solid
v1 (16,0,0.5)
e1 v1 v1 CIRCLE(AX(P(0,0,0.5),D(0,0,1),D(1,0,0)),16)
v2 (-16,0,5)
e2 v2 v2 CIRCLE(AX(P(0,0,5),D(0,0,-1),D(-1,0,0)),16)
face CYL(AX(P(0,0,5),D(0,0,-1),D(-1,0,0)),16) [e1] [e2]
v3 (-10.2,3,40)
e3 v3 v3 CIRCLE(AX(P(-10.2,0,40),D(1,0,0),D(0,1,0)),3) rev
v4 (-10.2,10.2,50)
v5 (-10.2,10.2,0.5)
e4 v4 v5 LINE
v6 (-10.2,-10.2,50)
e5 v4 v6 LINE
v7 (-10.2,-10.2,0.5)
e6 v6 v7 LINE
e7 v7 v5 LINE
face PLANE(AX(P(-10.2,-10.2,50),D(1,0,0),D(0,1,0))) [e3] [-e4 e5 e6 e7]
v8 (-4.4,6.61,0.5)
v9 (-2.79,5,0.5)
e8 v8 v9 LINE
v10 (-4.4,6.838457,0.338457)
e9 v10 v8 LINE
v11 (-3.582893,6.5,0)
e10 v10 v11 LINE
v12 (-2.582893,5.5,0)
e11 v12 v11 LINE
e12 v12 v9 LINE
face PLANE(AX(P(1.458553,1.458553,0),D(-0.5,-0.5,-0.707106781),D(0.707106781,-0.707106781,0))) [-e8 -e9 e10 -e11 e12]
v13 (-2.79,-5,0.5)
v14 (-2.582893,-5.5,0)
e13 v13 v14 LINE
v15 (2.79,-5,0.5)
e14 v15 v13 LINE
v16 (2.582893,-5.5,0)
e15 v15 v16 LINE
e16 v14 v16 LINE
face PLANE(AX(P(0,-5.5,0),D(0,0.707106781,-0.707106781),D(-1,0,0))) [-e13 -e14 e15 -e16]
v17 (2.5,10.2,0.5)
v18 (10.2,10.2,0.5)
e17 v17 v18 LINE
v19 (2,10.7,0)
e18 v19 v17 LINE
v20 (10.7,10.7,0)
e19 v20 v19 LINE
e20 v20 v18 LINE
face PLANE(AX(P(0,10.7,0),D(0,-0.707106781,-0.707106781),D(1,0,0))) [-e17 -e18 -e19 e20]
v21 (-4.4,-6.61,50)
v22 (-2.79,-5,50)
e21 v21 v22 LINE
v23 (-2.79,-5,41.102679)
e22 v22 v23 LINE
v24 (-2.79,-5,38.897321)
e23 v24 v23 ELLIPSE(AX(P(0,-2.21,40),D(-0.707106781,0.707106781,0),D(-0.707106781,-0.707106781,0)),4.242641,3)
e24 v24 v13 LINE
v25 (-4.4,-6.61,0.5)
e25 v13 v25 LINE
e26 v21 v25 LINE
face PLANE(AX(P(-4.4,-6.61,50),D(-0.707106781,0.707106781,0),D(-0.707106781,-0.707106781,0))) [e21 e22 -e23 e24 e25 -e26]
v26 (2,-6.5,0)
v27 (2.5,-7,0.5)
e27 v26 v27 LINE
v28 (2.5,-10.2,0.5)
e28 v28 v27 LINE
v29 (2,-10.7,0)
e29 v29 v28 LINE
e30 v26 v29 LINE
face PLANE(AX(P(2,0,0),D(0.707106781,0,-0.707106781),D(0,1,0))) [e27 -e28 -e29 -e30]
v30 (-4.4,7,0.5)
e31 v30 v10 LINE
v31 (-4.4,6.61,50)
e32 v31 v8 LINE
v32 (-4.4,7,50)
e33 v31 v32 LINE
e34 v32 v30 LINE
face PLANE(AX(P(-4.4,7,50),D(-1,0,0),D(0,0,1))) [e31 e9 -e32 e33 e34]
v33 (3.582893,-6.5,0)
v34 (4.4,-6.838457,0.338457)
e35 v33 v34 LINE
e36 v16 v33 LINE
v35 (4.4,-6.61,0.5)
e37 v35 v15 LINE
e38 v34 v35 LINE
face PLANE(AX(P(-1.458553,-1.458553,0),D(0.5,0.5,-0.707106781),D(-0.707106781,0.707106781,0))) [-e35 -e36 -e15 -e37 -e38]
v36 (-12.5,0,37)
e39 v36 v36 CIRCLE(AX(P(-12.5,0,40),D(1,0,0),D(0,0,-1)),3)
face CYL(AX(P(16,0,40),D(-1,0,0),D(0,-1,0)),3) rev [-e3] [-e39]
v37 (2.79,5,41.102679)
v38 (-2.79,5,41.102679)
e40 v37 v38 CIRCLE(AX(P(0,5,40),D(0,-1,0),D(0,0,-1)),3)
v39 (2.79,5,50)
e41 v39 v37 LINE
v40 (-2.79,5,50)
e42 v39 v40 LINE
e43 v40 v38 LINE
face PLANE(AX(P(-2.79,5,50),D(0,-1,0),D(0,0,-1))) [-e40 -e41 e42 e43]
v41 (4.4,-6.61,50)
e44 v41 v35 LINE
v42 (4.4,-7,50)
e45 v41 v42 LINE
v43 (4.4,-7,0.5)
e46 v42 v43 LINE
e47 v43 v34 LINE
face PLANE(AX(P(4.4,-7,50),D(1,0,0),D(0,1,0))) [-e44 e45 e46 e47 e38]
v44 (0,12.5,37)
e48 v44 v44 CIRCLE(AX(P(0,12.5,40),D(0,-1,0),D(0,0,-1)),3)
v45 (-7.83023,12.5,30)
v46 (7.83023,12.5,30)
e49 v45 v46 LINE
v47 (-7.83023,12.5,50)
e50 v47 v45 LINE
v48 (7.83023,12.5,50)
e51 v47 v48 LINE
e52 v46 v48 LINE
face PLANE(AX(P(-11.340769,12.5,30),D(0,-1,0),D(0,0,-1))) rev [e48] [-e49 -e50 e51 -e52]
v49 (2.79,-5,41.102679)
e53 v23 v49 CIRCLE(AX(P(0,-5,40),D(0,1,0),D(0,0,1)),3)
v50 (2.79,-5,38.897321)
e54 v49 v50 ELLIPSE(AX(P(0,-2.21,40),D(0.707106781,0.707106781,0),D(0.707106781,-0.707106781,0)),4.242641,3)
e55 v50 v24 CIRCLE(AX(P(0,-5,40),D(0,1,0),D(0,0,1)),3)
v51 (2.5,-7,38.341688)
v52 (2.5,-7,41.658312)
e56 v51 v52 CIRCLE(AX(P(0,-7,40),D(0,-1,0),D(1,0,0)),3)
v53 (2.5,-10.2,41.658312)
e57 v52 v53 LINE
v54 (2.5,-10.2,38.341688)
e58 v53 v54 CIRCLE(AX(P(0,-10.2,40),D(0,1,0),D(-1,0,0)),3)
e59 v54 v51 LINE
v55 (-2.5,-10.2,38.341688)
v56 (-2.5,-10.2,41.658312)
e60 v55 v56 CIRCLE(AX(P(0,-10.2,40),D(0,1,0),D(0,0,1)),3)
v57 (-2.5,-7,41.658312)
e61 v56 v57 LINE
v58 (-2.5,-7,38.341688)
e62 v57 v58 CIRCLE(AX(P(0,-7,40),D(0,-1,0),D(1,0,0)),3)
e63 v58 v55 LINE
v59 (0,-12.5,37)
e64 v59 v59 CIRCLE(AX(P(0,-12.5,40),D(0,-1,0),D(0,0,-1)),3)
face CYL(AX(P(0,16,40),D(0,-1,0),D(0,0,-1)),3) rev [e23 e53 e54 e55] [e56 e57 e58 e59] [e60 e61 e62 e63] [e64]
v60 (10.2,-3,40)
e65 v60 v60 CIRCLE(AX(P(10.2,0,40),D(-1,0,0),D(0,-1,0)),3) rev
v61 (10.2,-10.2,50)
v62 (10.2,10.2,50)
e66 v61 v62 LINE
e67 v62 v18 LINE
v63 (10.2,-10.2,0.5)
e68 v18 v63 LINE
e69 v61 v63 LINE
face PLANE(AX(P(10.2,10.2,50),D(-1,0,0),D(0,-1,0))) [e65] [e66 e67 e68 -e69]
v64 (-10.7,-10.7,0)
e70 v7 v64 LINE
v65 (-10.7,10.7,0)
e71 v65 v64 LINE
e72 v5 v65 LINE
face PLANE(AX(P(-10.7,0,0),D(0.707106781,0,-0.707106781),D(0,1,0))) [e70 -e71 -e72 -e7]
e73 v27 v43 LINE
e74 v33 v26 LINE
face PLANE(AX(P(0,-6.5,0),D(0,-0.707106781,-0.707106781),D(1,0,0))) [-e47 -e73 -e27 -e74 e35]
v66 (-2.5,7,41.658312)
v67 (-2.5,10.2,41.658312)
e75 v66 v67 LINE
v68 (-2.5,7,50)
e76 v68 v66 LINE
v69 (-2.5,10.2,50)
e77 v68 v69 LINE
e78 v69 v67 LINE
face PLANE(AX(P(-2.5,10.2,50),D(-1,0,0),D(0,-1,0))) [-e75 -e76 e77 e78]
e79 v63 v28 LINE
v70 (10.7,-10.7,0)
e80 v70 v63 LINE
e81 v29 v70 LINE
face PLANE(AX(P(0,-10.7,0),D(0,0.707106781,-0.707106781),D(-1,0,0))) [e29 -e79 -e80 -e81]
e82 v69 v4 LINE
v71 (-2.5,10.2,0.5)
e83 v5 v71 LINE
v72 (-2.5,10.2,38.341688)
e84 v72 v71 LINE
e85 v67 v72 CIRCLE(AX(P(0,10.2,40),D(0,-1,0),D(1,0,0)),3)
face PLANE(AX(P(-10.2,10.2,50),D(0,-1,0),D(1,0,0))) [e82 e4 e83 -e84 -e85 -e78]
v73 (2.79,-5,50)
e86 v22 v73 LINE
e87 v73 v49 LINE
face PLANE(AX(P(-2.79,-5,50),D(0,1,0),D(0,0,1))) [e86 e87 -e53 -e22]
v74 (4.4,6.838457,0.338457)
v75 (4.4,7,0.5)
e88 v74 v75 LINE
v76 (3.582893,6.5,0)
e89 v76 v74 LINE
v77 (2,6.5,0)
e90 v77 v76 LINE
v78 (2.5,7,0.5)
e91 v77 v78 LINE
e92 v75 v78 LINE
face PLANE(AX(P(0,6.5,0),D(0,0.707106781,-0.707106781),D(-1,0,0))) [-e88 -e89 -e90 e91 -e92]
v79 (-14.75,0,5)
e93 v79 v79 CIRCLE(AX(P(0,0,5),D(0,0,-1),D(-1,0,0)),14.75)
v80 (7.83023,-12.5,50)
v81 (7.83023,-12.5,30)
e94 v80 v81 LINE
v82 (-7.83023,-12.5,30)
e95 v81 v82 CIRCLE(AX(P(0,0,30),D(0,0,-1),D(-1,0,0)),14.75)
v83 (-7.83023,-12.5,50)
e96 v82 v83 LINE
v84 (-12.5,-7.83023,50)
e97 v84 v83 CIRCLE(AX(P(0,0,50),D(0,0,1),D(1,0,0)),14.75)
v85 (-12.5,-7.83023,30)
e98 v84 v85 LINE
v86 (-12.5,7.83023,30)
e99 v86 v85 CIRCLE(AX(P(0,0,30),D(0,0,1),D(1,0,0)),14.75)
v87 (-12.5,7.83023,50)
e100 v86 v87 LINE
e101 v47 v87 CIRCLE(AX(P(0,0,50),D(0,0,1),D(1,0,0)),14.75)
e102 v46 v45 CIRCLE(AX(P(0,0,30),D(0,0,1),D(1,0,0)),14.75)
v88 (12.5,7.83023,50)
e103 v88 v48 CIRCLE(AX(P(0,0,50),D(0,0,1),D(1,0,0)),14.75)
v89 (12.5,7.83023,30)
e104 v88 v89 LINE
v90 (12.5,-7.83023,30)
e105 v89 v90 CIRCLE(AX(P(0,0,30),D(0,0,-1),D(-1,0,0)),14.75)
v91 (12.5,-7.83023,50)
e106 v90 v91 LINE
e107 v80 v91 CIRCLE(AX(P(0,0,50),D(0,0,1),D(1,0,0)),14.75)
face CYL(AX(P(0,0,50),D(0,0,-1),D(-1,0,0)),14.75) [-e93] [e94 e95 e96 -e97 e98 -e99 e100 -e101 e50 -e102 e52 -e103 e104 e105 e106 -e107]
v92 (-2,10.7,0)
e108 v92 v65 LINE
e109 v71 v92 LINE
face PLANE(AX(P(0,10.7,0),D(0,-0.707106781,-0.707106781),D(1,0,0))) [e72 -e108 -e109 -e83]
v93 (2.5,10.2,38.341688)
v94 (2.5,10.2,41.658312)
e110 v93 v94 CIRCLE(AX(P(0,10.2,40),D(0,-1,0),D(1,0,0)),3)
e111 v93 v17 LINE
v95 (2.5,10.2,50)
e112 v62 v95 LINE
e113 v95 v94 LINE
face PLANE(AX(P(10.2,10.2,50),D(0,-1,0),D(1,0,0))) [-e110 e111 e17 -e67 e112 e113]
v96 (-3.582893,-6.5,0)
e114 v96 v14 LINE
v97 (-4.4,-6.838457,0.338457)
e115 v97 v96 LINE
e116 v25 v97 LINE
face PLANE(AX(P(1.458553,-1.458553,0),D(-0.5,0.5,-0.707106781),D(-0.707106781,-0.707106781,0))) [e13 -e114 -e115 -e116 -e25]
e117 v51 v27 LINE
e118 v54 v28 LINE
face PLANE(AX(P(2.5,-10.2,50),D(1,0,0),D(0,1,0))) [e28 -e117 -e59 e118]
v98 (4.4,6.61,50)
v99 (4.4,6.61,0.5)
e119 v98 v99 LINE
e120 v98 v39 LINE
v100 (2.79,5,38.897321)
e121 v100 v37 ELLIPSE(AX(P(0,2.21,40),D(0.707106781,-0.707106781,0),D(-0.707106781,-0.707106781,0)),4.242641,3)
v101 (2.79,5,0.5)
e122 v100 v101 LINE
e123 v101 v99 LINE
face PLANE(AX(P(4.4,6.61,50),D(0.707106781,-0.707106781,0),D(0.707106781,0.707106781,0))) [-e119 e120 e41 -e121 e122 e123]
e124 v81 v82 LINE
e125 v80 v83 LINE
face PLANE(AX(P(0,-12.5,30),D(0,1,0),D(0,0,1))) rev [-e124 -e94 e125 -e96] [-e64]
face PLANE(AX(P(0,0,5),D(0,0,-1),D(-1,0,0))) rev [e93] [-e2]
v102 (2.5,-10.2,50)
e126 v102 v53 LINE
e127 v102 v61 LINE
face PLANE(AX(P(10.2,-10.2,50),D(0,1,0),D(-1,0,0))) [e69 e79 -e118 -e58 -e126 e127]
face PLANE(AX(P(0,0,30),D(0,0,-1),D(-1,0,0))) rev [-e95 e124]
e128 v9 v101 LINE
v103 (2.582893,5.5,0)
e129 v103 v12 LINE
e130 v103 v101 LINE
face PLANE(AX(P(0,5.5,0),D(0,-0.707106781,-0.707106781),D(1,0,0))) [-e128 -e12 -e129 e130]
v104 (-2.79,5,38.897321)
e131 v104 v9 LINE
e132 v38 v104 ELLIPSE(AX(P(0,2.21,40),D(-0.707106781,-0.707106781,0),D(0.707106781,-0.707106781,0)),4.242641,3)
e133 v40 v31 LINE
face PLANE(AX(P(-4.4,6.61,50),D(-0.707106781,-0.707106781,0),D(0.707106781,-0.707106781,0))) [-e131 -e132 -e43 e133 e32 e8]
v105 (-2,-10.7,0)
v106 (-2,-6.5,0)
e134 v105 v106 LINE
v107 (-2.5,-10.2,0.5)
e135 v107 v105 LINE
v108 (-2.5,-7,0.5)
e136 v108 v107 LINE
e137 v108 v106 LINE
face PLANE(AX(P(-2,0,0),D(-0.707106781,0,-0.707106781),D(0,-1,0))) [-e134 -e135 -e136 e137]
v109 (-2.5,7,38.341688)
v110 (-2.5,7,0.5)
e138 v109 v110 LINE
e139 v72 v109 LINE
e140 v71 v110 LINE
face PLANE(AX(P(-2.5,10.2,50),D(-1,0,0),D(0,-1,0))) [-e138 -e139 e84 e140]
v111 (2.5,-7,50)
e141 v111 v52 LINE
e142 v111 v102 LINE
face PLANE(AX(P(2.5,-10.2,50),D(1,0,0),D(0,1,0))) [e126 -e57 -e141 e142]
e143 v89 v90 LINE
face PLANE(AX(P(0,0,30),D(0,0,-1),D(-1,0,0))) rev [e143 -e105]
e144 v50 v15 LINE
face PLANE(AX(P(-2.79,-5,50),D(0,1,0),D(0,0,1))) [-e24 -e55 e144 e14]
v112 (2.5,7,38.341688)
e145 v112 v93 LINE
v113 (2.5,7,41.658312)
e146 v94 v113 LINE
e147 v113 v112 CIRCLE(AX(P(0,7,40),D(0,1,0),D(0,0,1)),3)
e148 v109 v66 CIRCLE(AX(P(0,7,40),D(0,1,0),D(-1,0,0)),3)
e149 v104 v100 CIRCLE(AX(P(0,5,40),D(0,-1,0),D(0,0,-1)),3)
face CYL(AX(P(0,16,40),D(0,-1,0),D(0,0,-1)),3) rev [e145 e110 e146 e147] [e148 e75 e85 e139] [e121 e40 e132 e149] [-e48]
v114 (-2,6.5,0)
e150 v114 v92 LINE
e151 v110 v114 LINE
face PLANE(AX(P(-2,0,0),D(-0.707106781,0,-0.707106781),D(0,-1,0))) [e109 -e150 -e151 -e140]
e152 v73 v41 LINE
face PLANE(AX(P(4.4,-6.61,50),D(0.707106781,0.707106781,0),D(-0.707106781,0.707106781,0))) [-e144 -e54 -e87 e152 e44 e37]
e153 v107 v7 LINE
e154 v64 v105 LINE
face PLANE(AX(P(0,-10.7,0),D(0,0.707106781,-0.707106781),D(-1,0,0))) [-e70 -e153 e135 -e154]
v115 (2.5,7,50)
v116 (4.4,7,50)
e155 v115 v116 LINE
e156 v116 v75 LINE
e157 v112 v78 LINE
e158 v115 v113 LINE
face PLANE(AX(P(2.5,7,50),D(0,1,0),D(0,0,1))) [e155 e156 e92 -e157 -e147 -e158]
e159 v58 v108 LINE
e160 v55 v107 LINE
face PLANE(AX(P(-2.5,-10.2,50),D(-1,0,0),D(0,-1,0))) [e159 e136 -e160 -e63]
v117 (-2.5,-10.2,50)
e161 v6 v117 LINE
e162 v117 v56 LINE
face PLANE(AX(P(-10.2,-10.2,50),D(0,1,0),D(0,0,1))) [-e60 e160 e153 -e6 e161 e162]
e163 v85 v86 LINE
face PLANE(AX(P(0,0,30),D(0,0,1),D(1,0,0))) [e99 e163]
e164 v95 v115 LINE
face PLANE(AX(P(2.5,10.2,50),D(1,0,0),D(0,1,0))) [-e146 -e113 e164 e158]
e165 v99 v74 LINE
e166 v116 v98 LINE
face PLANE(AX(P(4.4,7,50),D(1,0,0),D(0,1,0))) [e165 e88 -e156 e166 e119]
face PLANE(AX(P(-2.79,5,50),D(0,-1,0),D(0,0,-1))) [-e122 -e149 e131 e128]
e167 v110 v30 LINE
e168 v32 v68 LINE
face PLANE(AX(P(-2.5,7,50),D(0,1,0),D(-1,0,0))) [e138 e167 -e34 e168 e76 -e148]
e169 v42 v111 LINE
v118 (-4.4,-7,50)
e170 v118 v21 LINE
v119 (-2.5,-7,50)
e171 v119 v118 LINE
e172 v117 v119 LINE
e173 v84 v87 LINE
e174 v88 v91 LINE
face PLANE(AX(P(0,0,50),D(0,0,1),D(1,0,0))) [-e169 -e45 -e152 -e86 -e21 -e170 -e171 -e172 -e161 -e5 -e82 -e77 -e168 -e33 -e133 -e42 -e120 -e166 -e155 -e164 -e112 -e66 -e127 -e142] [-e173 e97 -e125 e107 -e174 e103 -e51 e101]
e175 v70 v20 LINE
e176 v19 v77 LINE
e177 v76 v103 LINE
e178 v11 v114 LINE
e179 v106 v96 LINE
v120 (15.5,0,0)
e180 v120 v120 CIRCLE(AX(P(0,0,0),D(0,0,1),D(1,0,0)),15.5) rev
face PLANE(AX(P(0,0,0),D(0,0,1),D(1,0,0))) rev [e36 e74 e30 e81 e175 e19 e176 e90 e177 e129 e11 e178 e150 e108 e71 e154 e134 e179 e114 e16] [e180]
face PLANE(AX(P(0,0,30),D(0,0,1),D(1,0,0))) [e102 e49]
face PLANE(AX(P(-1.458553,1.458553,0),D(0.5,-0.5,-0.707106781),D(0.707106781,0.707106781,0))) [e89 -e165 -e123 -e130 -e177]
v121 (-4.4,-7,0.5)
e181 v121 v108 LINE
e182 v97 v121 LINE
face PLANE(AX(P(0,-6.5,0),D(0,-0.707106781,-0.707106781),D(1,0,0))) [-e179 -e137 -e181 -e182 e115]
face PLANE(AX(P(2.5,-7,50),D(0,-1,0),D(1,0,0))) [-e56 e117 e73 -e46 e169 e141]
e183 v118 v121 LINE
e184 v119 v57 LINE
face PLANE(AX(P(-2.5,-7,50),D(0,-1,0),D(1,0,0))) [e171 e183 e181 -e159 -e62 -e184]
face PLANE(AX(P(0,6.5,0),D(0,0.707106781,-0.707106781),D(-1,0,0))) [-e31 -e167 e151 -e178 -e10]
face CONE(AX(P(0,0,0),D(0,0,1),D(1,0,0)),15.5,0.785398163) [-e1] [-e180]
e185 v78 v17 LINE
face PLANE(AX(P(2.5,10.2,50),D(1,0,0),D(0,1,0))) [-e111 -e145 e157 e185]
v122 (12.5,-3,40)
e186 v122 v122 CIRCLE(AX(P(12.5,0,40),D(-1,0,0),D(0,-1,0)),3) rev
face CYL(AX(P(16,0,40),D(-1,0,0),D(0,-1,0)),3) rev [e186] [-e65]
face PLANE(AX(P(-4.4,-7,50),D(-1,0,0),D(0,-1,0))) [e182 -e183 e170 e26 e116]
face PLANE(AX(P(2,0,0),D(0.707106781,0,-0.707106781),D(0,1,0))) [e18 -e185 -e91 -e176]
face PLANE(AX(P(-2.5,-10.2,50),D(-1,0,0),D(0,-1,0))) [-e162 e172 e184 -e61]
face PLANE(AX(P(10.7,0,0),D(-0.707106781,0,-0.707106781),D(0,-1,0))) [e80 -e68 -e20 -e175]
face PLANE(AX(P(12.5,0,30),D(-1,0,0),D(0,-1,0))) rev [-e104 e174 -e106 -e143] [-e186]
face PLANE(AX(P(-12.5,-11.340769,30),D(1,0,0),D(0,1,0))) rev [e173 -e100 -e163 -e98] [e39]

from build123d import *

# Parameters (mm, degrees)
SKETCH1_R           = 14.75
BOSS_EXTRUDE1_DEPTH = 50
SKETCH6_R           = 16
SKETCH6_R_2         = 14.75
BOSS_EXTRUDE4_DEPTH = 5
CUT_EXTRUDE3_DEPTH  = 20
SKETCH8_R           = 3
CUT_EXTRUDE4_DEPTH  = 60.73483071
CHAMFER2_SIZE       = 0.5


with BuildPart() as part:
    # Sketch1 → Boss-Extrude1 (new body)
    with BuildSketch(Plane.XY):
        Circle(SKETCH1_R)
        Polygon((-10.2, 10.2), (-2.5, 10.2), (-2.5, 7), (-4.4, 7), (-4.4, 6.61), (-2.79, 5), (2.79, 5), (4.4, 6.61), (4.4, 7), (2.5, 7), (2.5, 10.2), (10.2, 10.2), (10.2, 2.5), (10.2, -2.5), (10.2, -10.2), (2.5, -10.2), (2.5, -7), (4.4, -7), (4.4, -6.61), (2.79, -5), (-2.79, -5), (-4.4, -6.61), (-4.4, -7), (-2.5, -7), (-2.5, -10.2), (-10.2, -10.2), (-10.2, -2.5), (-10.2, 2.5), align=None, mode=Mode.SUBTRACT)
    extrude(amount=BOSS_EXTRUDE1_DEPTH)

    # Sketch6 → Boss-Extrude4 (add)
    with BuildSketch(Plane(origin=(0, 0, 0), x_dir=(-1, 0, 0), z_dir=(0, 0, -1))):
        Circle(SKETCH6_R)
        Circle(SKETCH6_R_2, mode=Mode.SUBTRACT)
    extrude(amount=-BOSS_EXTRUDE4_DEPTH)

    # Sketch7 → Cut-Extrude3 (cut)
    with BuildSketch(Plane.XY.offset(50)):
        Polygon((0, -12.5), (11.066614126, -12.5), (11.066614126, -16.552961951), (-11.340768707, -16.552961951), (-11.340768707, -12.5), align=None)
        Polygon((-11.340768707, 12.5), (0, 12.5), (11.066614126, 12.5), (11.066614126, 16.552961951), (-11.340768707, 16.552961951), align=None)
        Polygon((12.5, 0), (12.5, 11.066614126), (16.552961951, 11.066614126), (16.552961951, -11.340768707), (12.5, -11.340768707), align=None)
        Polygon((-12.5, -11.340768707), (-12.5, 0), (-12.5, 11.066614126), (-16.552961951, 11.066614126), (-16.552961951, -11.340768707), align=None)
    extrude(amount=-CUT_EXTRUDE3_DEPTH, mode=Mode.SUBTRACT)

    # Sketch8 → Cut-Extrude4 (cut, through all)
    with BuildSketch(Plane.XZ.offset(12.5)):
        with Locations(Location((0, 40, 0), (0, 0, 270))):
            Circle(SKETCH8_R)
    cut_extrude4 = extrude(amount=-CUT_EXTRUDE4_DEPTH, mode=Mode.SUBTRACT)

    # Mirror1: Cut-Extrude4 across plane
    add(cut_extrude4.mirror(Plane(origin=(0, 0, 0), x_dir=(0, 0, 1), z_dir=(0.7071067811865495, -0.7071067811865457, 0))), mode=Mode.SUBTRACT)

    # Chamfer2
    # the kernel refuses this chamfer: 0.5 mm, written as the material it takes off along each edge
    with BuildSketch(Plane(origin=(-5.30922724, 7.51922724, 0), x_dir=(-0.019442520806013736, -0.01944252080601385, 0.9996219169112968), z_dir=(0.7071067811865497, -0.7071067811865455, 0)), Plane(origin=(1.88077276, 4.09077276, 0), x_dir=(0.019442520806013972, -0.01944252080601405, 0.9996219169112968), z_dir=(0.7071067811865489, 0.7071067811865461, 0)), Plane(origin=(5.30922724, -7.51922724, 0), x_dir=(0.019442520806013767, 0.019442520806013813, 0.9996219169112968), z_dir=(-0.7071067811865485, 0.7071067811865467, 0)), Plane(origin=(-1.88077276, -4.09077276, 0), x_dir=(-0.019442520806013986, 0.019442520806014035, 0.9996219169112968), z_dir=(-0.7071067811865485, -0.7071067811865467, 0))) as chamfer2_piece_1:
        Polygon((CHAMFER2_SIZE * 0.999621916911, -CHAMFER2_SIZE * 0.0274958766106), (-CHAMFER2_SIZE * 0.0274958766106, -CHAMFER2_SIZE * 0.999621916911), (0, 0), align=None)
    extrude(amount=4.848566823, mode=Mode.SUBTRACT)
    with BuildSketch(Plane(origin=(-4.075841494, 5, 0), x_dir=(0, 0.9996219169112968, -0.02749587661058639), z_dir=(1, 0, 0)), Plane(origin=(4.075841494, -5, 0), x_dir=(0, -0.9996219169112968, -0.02749587661058639), z_dir=(-1, 0, 0))) as chamfer2_piece_2:
        Polygon((CHAMFER2_SIZE * 0.999621916911, CHAMFER2_SIZE * 0.0274958766106), (-CHAMFER2_SIZE * 0.0274958766106, CHAMFER2_SIZE * 0.999621916911), (0, 0), align=None)
    extrude(amount=8.151682988, mode=Mode.SUBTRACT)
    with BuildSketch(Plane(origin=(5.685841494, 7, 0), x_dir=(0, 0.02749587661058563, 0.9996219169112968), z_dir=(-1, 0, 0)), Plane(origin=(2.5, -7, 0), x_dir=(0, -0.02749587661058563, 0.9996219169112968), z_dir=(1, 0, 0)), Plane(origin=(-5.685841494, -7, 0), x_dir=(0, -0.02749587661058563, 0.9996219169112968), z_dir=(1, 0, 0)), Plane(origin=(-2.5, 7, 0), x_dir=(0, 0.02749587661058563, 0.9996219169112968), z_dir=(-1, 0, 0))) as chamfer2_piece_3:
        Polygon((CHAMFER2_SIZE * 0.999621916911, -CHAMFER2_SIZE * 0.0274958766106), (-CHAMFER2_SIZE * 0.0274958766106, -CHAMFER2_SIZE * 0.999621916911), (0, 0), align=None)
    extrude(amount=3.185841494, mode=Mode.SUBTRACT)
    with BuildSketch(Plane(origin=(2.5, 7, 0), x_dir=(-0.9996219169112968, 2.3583319446590707e-15, -0.027495876610586365), z_dir=(0, 1, 0)), Plane(origin=(2.5, -10.2, 0), x_dir=(-0.9996219169112968, -2.0808811276403563e-15, -0.027495876610586365), z_dir=(0, 1, 0)), Plane(origin=(-2.5, -7, 0), x_dir=(0.9996219169112968, -2.0808811276403563e-15, -0.027495876610586365), z_dir=(0, -1, 0)), Plane(origin=(-2.5, 10.2, 0), x_dir=(0.9996219169112968, -9.19749458417038e-14, -0.027495876610586365), z_dir=(0, -1, 0))) as chamfer2_piece_4:
        Polygon((CHAMFER2_SIZE * 0.999621916911, CHAMFER2_SIZE * 0.0274958766106), (-CHAMFER2_SIZE * 0.0274958766106, CHAMFER2_SIZE * 0.999621916911), (0, 0), align=None)
    extrude(amount=3.2, mode=Mode.SUBTRACT)
    with BuildSketch(Plane(origin=(2.5, 10.2, 0), x_dir=(0, -0.02749587661058563, 0.9996219169112968), z_dir=(1, 0, 0)), Plane(origin=(10.2, -10.2, 0), x_dir=(0, 0.02749587661058563, 0.9996219169112968), z_dir=(-1, 0, 0)), Plane(origin=(-2.5, -10.2, 0), x_dir=(0, 0.02749587661058563, 0.9996219169112968), z_dir=(-1, 0, 0)), Plane(origin=(-10.2, 10.2, 0), x_dir=(0, -0.02749587661058563, 0.9996219169112968), z_dir=(1, 0, 0))) as chamfer2_piece_5:
        Polygon((CHAMFER2_SIZE * 0.999621916911, -CHAMFER2_SIZE * 0.0274958766106), (-CHAMFER2_SIZE * 0.0274958766106, -CHAMFER2_SIZE * 0.999621916911), (0, 0), align=None)
    extrude(amount=7.7, mode=Mode.SUBTRACT)
    with BuildSketch(Plane(origin=(10.2, 10.2, 0), x_dir=(-0.02749587661058563, 0, 0.9996219169112968), z_dir=(0, -1, 0)), Plane(origin=(-10.2, -10.2, 0), x_dir=(0.02749587661058563, 0, 0.9996219169112968), z_dir=(0, 1, 0))) as chamfer2_piece_6:
        Polygon((CHAMFER2_SIZE * 0.999621916911, -CHAMFER2_SIZE * 0.0274958766106), (-CHAMFER2_SIZE * 0.0274958766106, -CHAMFER2_SIZE * 0.999621916911), (0, 0), align=None)
    extrude(amount=20.4, mode=Mode.SUBTRACT)
    with BuildSketch(Plane(origin=(0, 0, 0), x_dir=(-1, 0, 0), z_dir=(0, -1, 0))) as chamfer2_piece_7:
        Polygon((16, -CHAMFER2_SIZE), (16 - CHAMFER2_SIZE, 0), (16, 0), align=None)
    revolve(axis=Axis((0, 0, 0), (0, 0, -1)), mode=Mode.SUBTRACT)
    with BuildSketch(Plane(origin=(5.685841494, 7, 0), x_dir=(0, 0.02749587661058563, 0.9996219169112968), z_dir=(-1, 0, 0))) as chamfer2_piece_8a_section:
        Polygon((CHAMFER2_SIZE * 0.999621916911, -CHAMFER2_SIZE * 0.0274958766106), (-CHAMFER2_SIZE * 0.0274958766106, -CHAMFER2_SIZE * 0.999621916911), (0, 0), align=None)
    chamfer2_piece_8a = extrude(amount=4.471682988, mode=Mode.PRIVATE)
    chamfer2_piece_8a = split(chamfer2_piece_8a, bisect_by=Plane(origin=(2.5, 6.835103187, 0.164896813), z_dir=(-1, 0, 0)), keep=Keep.TOP, mode=Mode.PRIVATE)
    with BuildSketch(Plane(origin=(2.5, 5.714158506, 0), x_dir=(-0.9996219169112968, 2.3583319446590707e-15, -0.027495876610586365), z_dir=(0, 1, 0))) as chamfer2_piece_8b_section:
        Polygon((CHAMFER2_SIZE * 0.999621916911, CHAMFER2_SIZE * 0.0274958766106), (-CHAMFER2_SIZE * 0.0274958766106, CHAMFER2_SIZE * 0.999621916911), (0, 0), align=None)
    chamfer2_piece_8b = extrude(amount=4.485841494, mode=Mode.PRIVATE)
    chamfer2_piece_8b = split(chamfer2_piece_8b, bisect_by=Plane(origin=(2.335103187, 7, 0.164896813), z_dir=(0, -1, 0)), keep=Keep.TOP, mode=Mode.PRIVATE)
    chamfer2_piece_8 = chamfer2_piece_8a & chamfer2_piece_8b
    add(chamfer2_piece_8, mode=Mode.SUBTRACT)
    with BuildSketch(Plane(origin=(1.214158506, 10.2, 0), x_dir=(0, -0.02749587661058563, 0.9996219169112968), z_dir=(1, 0, 0))) as chamfer2_piece_9a_section:
        Polygon((CHAMFER2_SIZE * 0.999621916911, -CHAMFER2_SIZE * 0.0274958766106), (-CHAMFER2_SIZE * 0.0274958766106, -CHAMFER2_SIZE * 0.999621916911), (0, 0), align=None)
    chamfer2_piece_9a = extrude(amount=8.985841494, mode=Mode.PRIVATE)
    chamfer2_piece_9a = split(chamfer2_piece_9a, bisect_by=Plane(origin=(2.5, 10.364896813, 0.164896813), z_dir=(-1, 0, 0)), keep=Keep.TOP, mode=Mode.PRIVATE)
    with BuildSketch(Plane(origin=(2.5, 7, 0), x_dir=(-0.9996219169112968, 2.3583319446590707e-15, -0.027495876610586365), z_dir=(0, 1, 0))) as chamfer2_piece_9b_section:
        Polygon((CHAMFER2_SIZE * 0.999621916911, CHAMFER2_SIZE * 0.0274958766106), (-CHAMFER2_SIZE * 0.0274958766106, CHAMFER2_SIZE * 0.999621916911), (0, 0), align=None)
    chamfer2_piece_9b = extrude(amount=4.485841494, mode=Mode.PRIVATE)
    chamfer2_piece_9b = split(chamfer2_piece_9b, bisect_by=Plane(origin=(2.335103187, 10.2, 0.164896813), z_dir=(0, 1, 0)), keep=Keep.TOP, mode=Mode.PRIVATE)
    chamfer2_piece_9 = chamfer2_piece_9a & chamfer2_piece_9b
    add(chamfer2_piece_9, mode=Mode.SUBTRACT)
    with BuildSketch(Plane(origin=(2.5, 10.2, 0), x_dir=(0, -0.02749587661058563, 0.9996219169112968), z_dir=(1, 0, 0))) as chamfer2_piece_10a_section:
        Polygon((CHAMFER2_SIZE * 0.999621916911, -CHAMFER2_SIZE * 0.0274958766106), (-CHAMFER2_SIZE * 0.0274958766106, -CHAMFER2_SIZE * 0.999621916911), (0, 0), align=None)
    chamfer2_piece_10a = extrude(amount=8.985841494, mode=Mode.PRIVATE)
    chamfer2_piece_10a = split(chamfer2_piece_10a, bisect_by=Plane(origin=(10.2, 10.364896813, 0.164896813), z_dir=(1, 0, 0)), keep=Keep.TOP, mode=Mode.PRIVATE)
    with BuildSketch(Plane(origin=(10.2, 11.485841494, 0), x_dir=(-0.02749587661058563, 0, 0.9996219169112968), z_dir=(0, -1, 0))) as chamfer2_piece_10b_section:
        Polygon((CHAMFER2_SIZE * 0.999621916911, -CHAMFER2_SIZE * 0.0274958766106), (-CHAMFER2_SIZE * 0.0274958766106, -CHAMFER2_SIZE * 0.999621916911), (0, 0), align=None)
    chamfer2_piece_10b = extrude(amount=21.685841494, mode=Mode.PRIVATE)
    chamfer2_piece_10b = split(chamfer2_piece_10b, bisect_by=Plane(origin=(10.364896813, 10.2, 0.164896813), z_dir=(0, 1, 0)), keep=Keep.TOP, mode=Mode.PRIVATE)
    chamfer2_piece_10 = chamfer2_piece_10a & chamfer2_piece_10b
    add(chamfer2_piece_10, mode=Mode.SUBTRACT)
    with BuildSketch(Plane(origin=(10.2, 10.2, 0), x_dir=(-0.02749587661058563, 0, 0.9996219169112968), z_dir=(0, -1, 0))) as chamfer2_piece_11a_section:
        Polygon((CHAMFER2_SIZE * 0.999621916911, -CHAMFER2_SIZE * 0.0274958766106), (-CHAMFER2_SIZE * 0.0274958766106, -CHAMFER2_SIZE * 0.999621916911), (0, 0), align=None)
    chamfer2_piece_11a = extrude(amount=21.685841494, mode=Mode.PRIVATE)
    chamfer2_piece_11a = split(chamfer2_piece_11a, bisect_by=Plane(origin=(10.364896813, -10.2, 0.164896813), z_dir=(0, -1, 0)), keep=Keep.TOP, mode=Mode.PRIVATE)
    with BuildSketch(Plane(origin=(11.485841494, -10.2, 0), x_dir=(0, 0.02749587661058563, 0.9996219169112968), z_dir=(-1, 0, 0))) as chamfer2_piece_11b_section:
        Polygon((CHAMFER2_SIZE * 0.999621916911, -CHAMFER2_SIZE * 0.0274958766106), (-CHAMFER2_SIZE * 0.0274958766106, -CHAMFER2_SIZE * 0.999621916911), (0, 0), align=None)
    chamfer2_piece_11b = extrude(amount=8.985841494, mode=Mode.PRIVATE)
    chamfer2_piece_11b = split(chamfer2_piece_11b, bisect_by=Plane(origin=(10.2, -10.364896813, 0.164896813), z_dir=(1, 0, 0)), keep=Keep.TOP, mode=Mode.PRIVATE)
    chamfer2_piece_11 = chamfer2_piece_11a & chamfer2_piece_11b
    add(chamfer2_piece_11, mode=Mode.SUBTRACT)
    with BuildSketch(Plane(origin=(10.2, -10.2, 0), x_dir=(0, 0.02749587661058563, 0.9996219169112968), z_dir=(-1, 0, 0))) as chamfer2_piece_12a_section:
        Polygon((CHAMFER2_SIZE * 0.999621916911, -CHAMFER2_SIZE * 0.0274958766106), (-CHAMFER2_SIZE * 0.0274958766106, -CHAMFER2_SIZE * 0.999621916911), (0, 0), align=None)
    chamfer2_piece_12a = extrude(amount=8.985841494, mode=Mode.PRIVATE)
    chamfer2_piece_12a = split(chamfer2_piece_12a, bisect_by=Plane(origin=(2.5, -10.364896813, 0.164896813), z_dir=(-1, 0, 0)), keep=Keep.TOP, mode=Mode.PRIVATE)
    with BuildSketch(Plane(origin=(2.5, -11.485841494, 0), x_dir=(-0.9996219169112968, -2.0808811276403563e-15, -0.027495876610586365), z_dir=(0, 1, 0))) as chamfer2_piece_12b_section:
        Polygon((CHAMFER2_SIZE * 0.999621916911, CHAMFER2_SIZE * 0.0274958766106), (-CHAMFER2_SIZE * 0.0274958766106, CHAMFER2_SIZE * 0.999621916911), (0, 0), align=None)
    chamfer2_piece_12b = extrude(amount=4.485841494, mode=Mode.PRIVATE)
    chamfer2_piece_12b = split(chamfer2_piece_12b, bisect_by=Plane(origin=(2.335103187, -10.2, 0.164896813), z_dir=(0, -1, 0)), keep=Keep.TOP, mode=Mode.PRIVATE)
    chamfer2_piece_12 = chamfer2_piece_12a & chamfer2_piece_12b
    add(chamfer2_piece_12, mode=Mode.SUBTRACT)
    with BuildSketch(Plane(origin=(1.214158506, -7, 0), x_dir=(0, -0.02749587661058563, 0.9996219169112968), z_dir=(1, 0, 0))) as chamfer2_piece_13a_section:
        Polygon((CHAMFER2_SIZE * 0.999621916911, -CHAMFER2_SIZE * 0.0274958766106), (-CHAMFER2_SIZE * 0.0274958766106, -CHAMFER2_SIZE * 0.999621916911), (0, 0), align=None)
    chamfer2_piece_13a = extrude(amount=4.471682988, mode=Mode.PRIVATE)
    chamfer2_piece_13a = split(chamfer2_piece_13a, bisect_by=Plane(origin=(2.5, -6.835103187, 0.164896813), z_dir=(-1, 0, 0)), keep=Keep.TOP, mode=Mode.PRIVATE)
    with BuildSketch(Plane(origin=(2.5, -10.2, 0), x_dir=(-0.9996219169112968, -2.0808811276403563e-15, -0.027495876610586365), z_dir=(0, 1, 0))) as chamfer2_piece_13b_section:
        Polygon((CHAMFER2_SIZE * 0.999621916911, CHAMFER2_SIZE * 0.0274958766106), (-CHAMFER2_SIZE * 0.0274958766106, CHAMFER2_SIZE * 0.999621916911), (0, 0), align=None)
    chamfer2_piece_13b = extrude(amount=4.485841494, mode=Mode.PRIVATE)
    chamfer2_piece_13b = split(chamfer2_piece_13b, bisect_by=Plane(origin=(2.335103187, -7, 0.164896813), z_dir=(0, 1, 0)), keep=Keep.TOP, mode=Mode.PRIVATE)
    chamfer2_piece_13 = chamfer2_piece_13a & chamfer2_piece_13b
    add(chamfer2_piece_13, mode=Mode.SUBTRACT)
    with BuildSketch(Plane(origin=(-5.685841494, -7, 0), x_dir=(0, -0.02749587661058563, 0.9996219169112968), z_dir=(1, 0, 0))) as chamfer2_piece_14a_section:
        Polygon((CHAMFER2_SIZE * 0.999621916911, -CHAMFER2_SIZE * 0.0274958766106), (-CHAMFER2_SIZE * 0.0274958766106, -CHAMFER2_SIZE * 0.999621916911), (0, 0), align=None)
    chamfer2_piece_14a = extrude(amount=4.471682988, mode=Mode.PRIVATE)
    chamfer2_piece_14a = split(chamfer2_piece_14a, bisect_by=Plane(origin=(-2.5, -6.835103187, 0.164896813), z_dir=(1, 0, 0)), keep=Keep.TOP, mode=Mode.PRIVATE)
    with BuildSketch(Plane(origin=(-2.5, -5.714158506, 0), x_dir=(0.9996219169112968, -2.0808811276403563e-15, -0.027495876610586365), z_dir=(0, -1, 0))) as chamfer2_piece_14b_section:
        Polygon((CHAMFER2_SIZE * 0.999621916911, CHAMFER2_SIZE * 0.0274958766106), (-CHAMFER2_SIZE * 0.0274958766106, CHAMFER2_SIZE * 0.999621916911), (0, 0), align=None)
    chamfer2_piece_14b = extrude(amount=4.485841494, mode=Mode.PRIVATE)
    chamfer2_piece_14b = split(chamfer2_piece_14b, bisect_by=Plane(origin=(-2.335103187, -7, 0.164896813), z_dir=(0, 1, 0)), keep=Keep.TOP, mode=Mode.PRIVATE)
    chamfer2_piece_14 = chamfer2_piece_14a & chamfer2_piece_14b
    add(chamfer2_piece_14, mode=Mode.SUBTRACT)
    with BuildSketch(Plane(origin=(-1.214158506, -10.2, 0), x_dir=(0, 0.02749587661058563, 0.9996219169112968), z_dir=(-1, 0, 0))) as chamfer2_piece_15a_section:
        Polygon((CHAMFER2_SIZE * 0.999621916911, -CHAMFER2_SIZE * 0.0274958766106), (-CHAMFER2_SIZE * 0.0274958766106, -CHAMFER2_SIZE * 0.999621916911), (0, 0), align=None)
    chamfer2_piece_15a = extrude(amount=8.985841494, mode=Mode.PRIVATE)
    chamfer2_piece_15a = split(chamfer2_piece_15a, bisect_by=Plane(origin=(-2.5, -10.364896813, 0.164896813), z_dir=(1, 0, 0)), keep=Keep.TOP, mode=Mode.PRIVATE)
    with BuildSketch(Plane(origin=(-2.5, -7, 0), x_dir=(0.9996219169112968, -2.0808811276403563e-15, -0.027495876610586365), z_dir=(0, -1, 0))) as chamfer2_piece_15b_section:
        Polygon((CHAMFER2_SIZE * 0.999621916911, CHAMFER2_SIZE * 0.0274958766106), (-CHAMFER2_SIZE * 0.0274958766106, CHAMFER2_SIZE * 0.999621916911), (0, 0), align=None)
    chamfer2_piece_15b = extrude(amount=4.485841494, mode=Mode.PRIVATE)
    chamfer2_piece_15b = split(chamfer2_piece_15b, bisect_by=Plane(origin=(-2.335103187, -10.2, 0.164896813), z_dir=(0, -1, 0)), keep=Keep.TOP, mode=Mode.PRIVATE)
    chamfer2_piece_15 = chamfer2_piece_15a & chamfer2_piece_15b
    add(chamfer2_piece_15, mode=Mode.SUBTRACT)
    with BuildSketch(Plane(origin=(-10.2, -11.485841494, 0), x_dir=(0.02749587661058563, 0, 0.9996219169112968), z_dir=(0, 1, 0))) as chamfer2_piece_16a_section:
        Polygon((CHAMFER2_SIZE * 0.999621916911, -CHAMFER2_SIZE * 0.0274958766106), (-CHAMFER2_SIZE * 0.0274958766106, -CHAMFER2_SIZE * 0.999621916911), (0, 0), align=None)
    chamfer2_piece_16a = extrude(amount=21.685841494, mode=Mode.PRIVATE)
    chamfer2_piece_16a = split(chamfer2_piece_16a, bisect_by=Plane(origin=(-10.364896813, -10.2, 0.164896813), z_dir=(0, -1, 0)), keep=Keep.TOP, mode=Mode.PRIVATE)
    with BuildSketch(Plane(origin=(-2.5, -10.2, 0), x_dir=(0, 0.02749587661058563, 0.9996219169112968), z_dir=(-1, 0, 0))) as chamfer2_piece_16b_section:
        Polygon((CHAMFER2_SIZE * 0.999621916911, -CHAMFER2_SIZE * 0.0274958766106), (-CHAMFER2_SIZE * 0.0274958766106, -CHAMFER2_SIZE * 0.999621916911), (0, 0), align=None)
    chamfer2_piece_16b = extrude(amount=8.985841494, mode=Mode.PRIVATE)
    chamfer2_piece_16b = split(chamfer2_piece_16b, bisect_by=Plane(origin=(-10.2, -10.364896813, 0.164896813), z_dir=(-1, 0, 0)), keep=Keep.TOP, mode=Mode.PRIVATE)
    chamfer2_piece_16 = chamfer2_piece_16a & chamfer2_piece_16b
    add(chamfer2_piece_16, mode=Mode.SUBTRACT)
    with BuildSketch(Plane(origin=(-11.485841494, 10.2, 0), x_dir=(0, -0.02749587661058563, 0.9996219169112968), z_dir=(1, 0, 0))) as chamfer2_piece_17a_section:
        Polygon((CHAMFER2_SIZE * 0.999621916911, -CHAMFER2_SIZE * 0.0274958766106), (-CHAMFER2_SIZE * 0.0274958766106, -CHAMFER2_SIZE * 0.999621916911), (0, 0), align=None)
    chamfer2_piece_17a = extrude(amount=8.985841494, mode=Mode.PRIVATE)
    chamfer2_piece_17a = split(chamfer2_piece_17a, bisect_by=Plane(origin=(-10.2, 10.364896813, 0.164896813), z_dir=(-1, 0, 0)), keep=Keep.TOP, mode=Mode.PRIVATE)
    with BuildSketch(Plane(origin=(-10.2, -10.2, 0), x_dir=(0.02749587661058563, 0, 0.9996219169112968), z_dir=(0, 1, 0))) as chamfer2_piece_17b_section:
        Polygon((CHAMFER2_SIZE * 0.999621916911, -CHAMFER2_SIZE * 0.0274958766106), (-CHAMFER2_SIZE * 0.0274958766106, -CHAMFER2_SIZE * 0.999621916911), (0, 0), align=None)
    chamfer2_piece_17b = extrude(amount=21.685841494, mode=Mode.PRIVATE)
    chamfer2_piece_17b = split(chamfer2_piece_17b, bisect_by=Plane(origin=(-10.364896813, 10.2, 0.164896813), z_dir=(0, 1, 0)), keep=Keep.TOP, mode=Mode.PRIVATE)
    chamfer2_piece_17 = chamfer2_piece_17a & chamfer2_piece_17b
    add(chamfer2_piece_17, mode=Mode.SUBTRACT)
    with BuildSketch(Plane(origin=(-10.2, 10.2, 0), x_dir=(0, -0.02749587661058563, 0.9996219169112968), z_dir=(1, 0, 0))) as chamfer2_piece_18a_section:
        Polygon((CHAMFER2_SIZE * 0.999621916911, -CHAMFER2_SIZE * 0.0274958766106), (-CHAMFER2_SIZE * 0.0274958766106, -CHAMFER2_SIZE * 0.999621916911), (0, 0), align=None)
    chamfer2_piece_18a = extrude(amount=8.985841494, mode=Mode.PRIVATE)
    chamfer2_piece_18a = split(chamfer2_piece_18a, bisect_by=Plane(origin=(-2.5, 10.364896813, 0.164896813), z_dir=(1, 0, 0)), keep=Keep.TOP, mode=Mode.PRIVATE)
    with BuildSketch(Plane(origin=(-2.5, 11.485841494, 0), x_dir=(0.9996219169112968, -9.19749458417038e-14, -0.027495876610586365), z_dir=(0, -1, 0))) as chamfer2_piece_18b_section:
        Polygon((CHAMFER2_SIZE * 0.999621916911, CHAMFER2_SIZE * 0.0274958766106), (-CHAMFER2_SIZE * 0.0274958766106, CHAMFER2_SIZE * 0.999621916911), (0, 0), align=None)
    chamfer2_piece_18b = extrude(amount=4.485841494, mode=Mode.PRIVATE)
    chamfer2_piece_18b = split(chamfer2_piece_18b, bisect_by=Plane(origin=(-2.335103187, 10.2, 0.164896813), z_dir=(0, 1, 0)), keep=Keep.TOP, mode=Mode.PRIVATE)
    chamfer2_piece_18 = chamfer2_piece_18a & chamfer2_piece_18b
    add(chamfer2_piece_18, mode=Mode.SUBTRACT)
    with BuildSketch(Plane(origin=(-1.214158506, 7, 0), x_dir=(0, 0.02749587661058563, 0.9996219169112968), z_dir=(-1, 0, 0))) as chamfer2_piece_19a_section:
        Polygon((CHAMFER2_SIZE * 0.999621916911, -CHAMFER2_SIZE * 0.0274958766106), (-CHAMFER2_SIZE * 0.0274958766106, -CHAMFER2_SIZE * 0.999621916911), (0, 0), align=None)
    chamfer2_piece_19a = extrude(amount=4.471682988, mode=Mode.PRIVATE)
    chamfer2_piece_19a = split(chamfer2_piece_19a, bisect_by=Plane(origin=(-2.5, 6.835103187, 0.164896813), z_dir=(1, 0, 0)), keep=Keep.TOP, mode=Mode.PRIVATE)
    with BuildSketch(Plane(origin=(-2.5, 10.2, 0), x_dir=(0.9996219169112968, -9.19749458417038e-14, -0.027495876610586365), z_dir=(0, -1, 0))) as chamfer2_piece_19b_section:
        Polygon((CHAMFER2_SIZE * 0.999621916911, CHAMFER2_SIZE * 0.0274958766106), (-CHAMFER2_SIZE * 0.0274958766106, CHAMFER2_SIZE * 0.999621916911), (0, 0), align=None)
    chamfer2_piece_19b = extrude(amount=4.485841494, mode=Mode.PRIVATE)
    chamfer2_piece_19b = split(chamfer2_piece_19b, bisect_by=Plane(origin=(-2.335103187, 7, 0.164896813), z_dir=(0, -1, 0)), keep=Keep.TOP, mode=Mode.PRIVATE)
    chamfer2_piece_19 = chamfer2_piece_19a & chamfer2_piece_19b
    add(chamfer2_piece_19, mode=Mode.SUBTRACT)


solid = part.part
